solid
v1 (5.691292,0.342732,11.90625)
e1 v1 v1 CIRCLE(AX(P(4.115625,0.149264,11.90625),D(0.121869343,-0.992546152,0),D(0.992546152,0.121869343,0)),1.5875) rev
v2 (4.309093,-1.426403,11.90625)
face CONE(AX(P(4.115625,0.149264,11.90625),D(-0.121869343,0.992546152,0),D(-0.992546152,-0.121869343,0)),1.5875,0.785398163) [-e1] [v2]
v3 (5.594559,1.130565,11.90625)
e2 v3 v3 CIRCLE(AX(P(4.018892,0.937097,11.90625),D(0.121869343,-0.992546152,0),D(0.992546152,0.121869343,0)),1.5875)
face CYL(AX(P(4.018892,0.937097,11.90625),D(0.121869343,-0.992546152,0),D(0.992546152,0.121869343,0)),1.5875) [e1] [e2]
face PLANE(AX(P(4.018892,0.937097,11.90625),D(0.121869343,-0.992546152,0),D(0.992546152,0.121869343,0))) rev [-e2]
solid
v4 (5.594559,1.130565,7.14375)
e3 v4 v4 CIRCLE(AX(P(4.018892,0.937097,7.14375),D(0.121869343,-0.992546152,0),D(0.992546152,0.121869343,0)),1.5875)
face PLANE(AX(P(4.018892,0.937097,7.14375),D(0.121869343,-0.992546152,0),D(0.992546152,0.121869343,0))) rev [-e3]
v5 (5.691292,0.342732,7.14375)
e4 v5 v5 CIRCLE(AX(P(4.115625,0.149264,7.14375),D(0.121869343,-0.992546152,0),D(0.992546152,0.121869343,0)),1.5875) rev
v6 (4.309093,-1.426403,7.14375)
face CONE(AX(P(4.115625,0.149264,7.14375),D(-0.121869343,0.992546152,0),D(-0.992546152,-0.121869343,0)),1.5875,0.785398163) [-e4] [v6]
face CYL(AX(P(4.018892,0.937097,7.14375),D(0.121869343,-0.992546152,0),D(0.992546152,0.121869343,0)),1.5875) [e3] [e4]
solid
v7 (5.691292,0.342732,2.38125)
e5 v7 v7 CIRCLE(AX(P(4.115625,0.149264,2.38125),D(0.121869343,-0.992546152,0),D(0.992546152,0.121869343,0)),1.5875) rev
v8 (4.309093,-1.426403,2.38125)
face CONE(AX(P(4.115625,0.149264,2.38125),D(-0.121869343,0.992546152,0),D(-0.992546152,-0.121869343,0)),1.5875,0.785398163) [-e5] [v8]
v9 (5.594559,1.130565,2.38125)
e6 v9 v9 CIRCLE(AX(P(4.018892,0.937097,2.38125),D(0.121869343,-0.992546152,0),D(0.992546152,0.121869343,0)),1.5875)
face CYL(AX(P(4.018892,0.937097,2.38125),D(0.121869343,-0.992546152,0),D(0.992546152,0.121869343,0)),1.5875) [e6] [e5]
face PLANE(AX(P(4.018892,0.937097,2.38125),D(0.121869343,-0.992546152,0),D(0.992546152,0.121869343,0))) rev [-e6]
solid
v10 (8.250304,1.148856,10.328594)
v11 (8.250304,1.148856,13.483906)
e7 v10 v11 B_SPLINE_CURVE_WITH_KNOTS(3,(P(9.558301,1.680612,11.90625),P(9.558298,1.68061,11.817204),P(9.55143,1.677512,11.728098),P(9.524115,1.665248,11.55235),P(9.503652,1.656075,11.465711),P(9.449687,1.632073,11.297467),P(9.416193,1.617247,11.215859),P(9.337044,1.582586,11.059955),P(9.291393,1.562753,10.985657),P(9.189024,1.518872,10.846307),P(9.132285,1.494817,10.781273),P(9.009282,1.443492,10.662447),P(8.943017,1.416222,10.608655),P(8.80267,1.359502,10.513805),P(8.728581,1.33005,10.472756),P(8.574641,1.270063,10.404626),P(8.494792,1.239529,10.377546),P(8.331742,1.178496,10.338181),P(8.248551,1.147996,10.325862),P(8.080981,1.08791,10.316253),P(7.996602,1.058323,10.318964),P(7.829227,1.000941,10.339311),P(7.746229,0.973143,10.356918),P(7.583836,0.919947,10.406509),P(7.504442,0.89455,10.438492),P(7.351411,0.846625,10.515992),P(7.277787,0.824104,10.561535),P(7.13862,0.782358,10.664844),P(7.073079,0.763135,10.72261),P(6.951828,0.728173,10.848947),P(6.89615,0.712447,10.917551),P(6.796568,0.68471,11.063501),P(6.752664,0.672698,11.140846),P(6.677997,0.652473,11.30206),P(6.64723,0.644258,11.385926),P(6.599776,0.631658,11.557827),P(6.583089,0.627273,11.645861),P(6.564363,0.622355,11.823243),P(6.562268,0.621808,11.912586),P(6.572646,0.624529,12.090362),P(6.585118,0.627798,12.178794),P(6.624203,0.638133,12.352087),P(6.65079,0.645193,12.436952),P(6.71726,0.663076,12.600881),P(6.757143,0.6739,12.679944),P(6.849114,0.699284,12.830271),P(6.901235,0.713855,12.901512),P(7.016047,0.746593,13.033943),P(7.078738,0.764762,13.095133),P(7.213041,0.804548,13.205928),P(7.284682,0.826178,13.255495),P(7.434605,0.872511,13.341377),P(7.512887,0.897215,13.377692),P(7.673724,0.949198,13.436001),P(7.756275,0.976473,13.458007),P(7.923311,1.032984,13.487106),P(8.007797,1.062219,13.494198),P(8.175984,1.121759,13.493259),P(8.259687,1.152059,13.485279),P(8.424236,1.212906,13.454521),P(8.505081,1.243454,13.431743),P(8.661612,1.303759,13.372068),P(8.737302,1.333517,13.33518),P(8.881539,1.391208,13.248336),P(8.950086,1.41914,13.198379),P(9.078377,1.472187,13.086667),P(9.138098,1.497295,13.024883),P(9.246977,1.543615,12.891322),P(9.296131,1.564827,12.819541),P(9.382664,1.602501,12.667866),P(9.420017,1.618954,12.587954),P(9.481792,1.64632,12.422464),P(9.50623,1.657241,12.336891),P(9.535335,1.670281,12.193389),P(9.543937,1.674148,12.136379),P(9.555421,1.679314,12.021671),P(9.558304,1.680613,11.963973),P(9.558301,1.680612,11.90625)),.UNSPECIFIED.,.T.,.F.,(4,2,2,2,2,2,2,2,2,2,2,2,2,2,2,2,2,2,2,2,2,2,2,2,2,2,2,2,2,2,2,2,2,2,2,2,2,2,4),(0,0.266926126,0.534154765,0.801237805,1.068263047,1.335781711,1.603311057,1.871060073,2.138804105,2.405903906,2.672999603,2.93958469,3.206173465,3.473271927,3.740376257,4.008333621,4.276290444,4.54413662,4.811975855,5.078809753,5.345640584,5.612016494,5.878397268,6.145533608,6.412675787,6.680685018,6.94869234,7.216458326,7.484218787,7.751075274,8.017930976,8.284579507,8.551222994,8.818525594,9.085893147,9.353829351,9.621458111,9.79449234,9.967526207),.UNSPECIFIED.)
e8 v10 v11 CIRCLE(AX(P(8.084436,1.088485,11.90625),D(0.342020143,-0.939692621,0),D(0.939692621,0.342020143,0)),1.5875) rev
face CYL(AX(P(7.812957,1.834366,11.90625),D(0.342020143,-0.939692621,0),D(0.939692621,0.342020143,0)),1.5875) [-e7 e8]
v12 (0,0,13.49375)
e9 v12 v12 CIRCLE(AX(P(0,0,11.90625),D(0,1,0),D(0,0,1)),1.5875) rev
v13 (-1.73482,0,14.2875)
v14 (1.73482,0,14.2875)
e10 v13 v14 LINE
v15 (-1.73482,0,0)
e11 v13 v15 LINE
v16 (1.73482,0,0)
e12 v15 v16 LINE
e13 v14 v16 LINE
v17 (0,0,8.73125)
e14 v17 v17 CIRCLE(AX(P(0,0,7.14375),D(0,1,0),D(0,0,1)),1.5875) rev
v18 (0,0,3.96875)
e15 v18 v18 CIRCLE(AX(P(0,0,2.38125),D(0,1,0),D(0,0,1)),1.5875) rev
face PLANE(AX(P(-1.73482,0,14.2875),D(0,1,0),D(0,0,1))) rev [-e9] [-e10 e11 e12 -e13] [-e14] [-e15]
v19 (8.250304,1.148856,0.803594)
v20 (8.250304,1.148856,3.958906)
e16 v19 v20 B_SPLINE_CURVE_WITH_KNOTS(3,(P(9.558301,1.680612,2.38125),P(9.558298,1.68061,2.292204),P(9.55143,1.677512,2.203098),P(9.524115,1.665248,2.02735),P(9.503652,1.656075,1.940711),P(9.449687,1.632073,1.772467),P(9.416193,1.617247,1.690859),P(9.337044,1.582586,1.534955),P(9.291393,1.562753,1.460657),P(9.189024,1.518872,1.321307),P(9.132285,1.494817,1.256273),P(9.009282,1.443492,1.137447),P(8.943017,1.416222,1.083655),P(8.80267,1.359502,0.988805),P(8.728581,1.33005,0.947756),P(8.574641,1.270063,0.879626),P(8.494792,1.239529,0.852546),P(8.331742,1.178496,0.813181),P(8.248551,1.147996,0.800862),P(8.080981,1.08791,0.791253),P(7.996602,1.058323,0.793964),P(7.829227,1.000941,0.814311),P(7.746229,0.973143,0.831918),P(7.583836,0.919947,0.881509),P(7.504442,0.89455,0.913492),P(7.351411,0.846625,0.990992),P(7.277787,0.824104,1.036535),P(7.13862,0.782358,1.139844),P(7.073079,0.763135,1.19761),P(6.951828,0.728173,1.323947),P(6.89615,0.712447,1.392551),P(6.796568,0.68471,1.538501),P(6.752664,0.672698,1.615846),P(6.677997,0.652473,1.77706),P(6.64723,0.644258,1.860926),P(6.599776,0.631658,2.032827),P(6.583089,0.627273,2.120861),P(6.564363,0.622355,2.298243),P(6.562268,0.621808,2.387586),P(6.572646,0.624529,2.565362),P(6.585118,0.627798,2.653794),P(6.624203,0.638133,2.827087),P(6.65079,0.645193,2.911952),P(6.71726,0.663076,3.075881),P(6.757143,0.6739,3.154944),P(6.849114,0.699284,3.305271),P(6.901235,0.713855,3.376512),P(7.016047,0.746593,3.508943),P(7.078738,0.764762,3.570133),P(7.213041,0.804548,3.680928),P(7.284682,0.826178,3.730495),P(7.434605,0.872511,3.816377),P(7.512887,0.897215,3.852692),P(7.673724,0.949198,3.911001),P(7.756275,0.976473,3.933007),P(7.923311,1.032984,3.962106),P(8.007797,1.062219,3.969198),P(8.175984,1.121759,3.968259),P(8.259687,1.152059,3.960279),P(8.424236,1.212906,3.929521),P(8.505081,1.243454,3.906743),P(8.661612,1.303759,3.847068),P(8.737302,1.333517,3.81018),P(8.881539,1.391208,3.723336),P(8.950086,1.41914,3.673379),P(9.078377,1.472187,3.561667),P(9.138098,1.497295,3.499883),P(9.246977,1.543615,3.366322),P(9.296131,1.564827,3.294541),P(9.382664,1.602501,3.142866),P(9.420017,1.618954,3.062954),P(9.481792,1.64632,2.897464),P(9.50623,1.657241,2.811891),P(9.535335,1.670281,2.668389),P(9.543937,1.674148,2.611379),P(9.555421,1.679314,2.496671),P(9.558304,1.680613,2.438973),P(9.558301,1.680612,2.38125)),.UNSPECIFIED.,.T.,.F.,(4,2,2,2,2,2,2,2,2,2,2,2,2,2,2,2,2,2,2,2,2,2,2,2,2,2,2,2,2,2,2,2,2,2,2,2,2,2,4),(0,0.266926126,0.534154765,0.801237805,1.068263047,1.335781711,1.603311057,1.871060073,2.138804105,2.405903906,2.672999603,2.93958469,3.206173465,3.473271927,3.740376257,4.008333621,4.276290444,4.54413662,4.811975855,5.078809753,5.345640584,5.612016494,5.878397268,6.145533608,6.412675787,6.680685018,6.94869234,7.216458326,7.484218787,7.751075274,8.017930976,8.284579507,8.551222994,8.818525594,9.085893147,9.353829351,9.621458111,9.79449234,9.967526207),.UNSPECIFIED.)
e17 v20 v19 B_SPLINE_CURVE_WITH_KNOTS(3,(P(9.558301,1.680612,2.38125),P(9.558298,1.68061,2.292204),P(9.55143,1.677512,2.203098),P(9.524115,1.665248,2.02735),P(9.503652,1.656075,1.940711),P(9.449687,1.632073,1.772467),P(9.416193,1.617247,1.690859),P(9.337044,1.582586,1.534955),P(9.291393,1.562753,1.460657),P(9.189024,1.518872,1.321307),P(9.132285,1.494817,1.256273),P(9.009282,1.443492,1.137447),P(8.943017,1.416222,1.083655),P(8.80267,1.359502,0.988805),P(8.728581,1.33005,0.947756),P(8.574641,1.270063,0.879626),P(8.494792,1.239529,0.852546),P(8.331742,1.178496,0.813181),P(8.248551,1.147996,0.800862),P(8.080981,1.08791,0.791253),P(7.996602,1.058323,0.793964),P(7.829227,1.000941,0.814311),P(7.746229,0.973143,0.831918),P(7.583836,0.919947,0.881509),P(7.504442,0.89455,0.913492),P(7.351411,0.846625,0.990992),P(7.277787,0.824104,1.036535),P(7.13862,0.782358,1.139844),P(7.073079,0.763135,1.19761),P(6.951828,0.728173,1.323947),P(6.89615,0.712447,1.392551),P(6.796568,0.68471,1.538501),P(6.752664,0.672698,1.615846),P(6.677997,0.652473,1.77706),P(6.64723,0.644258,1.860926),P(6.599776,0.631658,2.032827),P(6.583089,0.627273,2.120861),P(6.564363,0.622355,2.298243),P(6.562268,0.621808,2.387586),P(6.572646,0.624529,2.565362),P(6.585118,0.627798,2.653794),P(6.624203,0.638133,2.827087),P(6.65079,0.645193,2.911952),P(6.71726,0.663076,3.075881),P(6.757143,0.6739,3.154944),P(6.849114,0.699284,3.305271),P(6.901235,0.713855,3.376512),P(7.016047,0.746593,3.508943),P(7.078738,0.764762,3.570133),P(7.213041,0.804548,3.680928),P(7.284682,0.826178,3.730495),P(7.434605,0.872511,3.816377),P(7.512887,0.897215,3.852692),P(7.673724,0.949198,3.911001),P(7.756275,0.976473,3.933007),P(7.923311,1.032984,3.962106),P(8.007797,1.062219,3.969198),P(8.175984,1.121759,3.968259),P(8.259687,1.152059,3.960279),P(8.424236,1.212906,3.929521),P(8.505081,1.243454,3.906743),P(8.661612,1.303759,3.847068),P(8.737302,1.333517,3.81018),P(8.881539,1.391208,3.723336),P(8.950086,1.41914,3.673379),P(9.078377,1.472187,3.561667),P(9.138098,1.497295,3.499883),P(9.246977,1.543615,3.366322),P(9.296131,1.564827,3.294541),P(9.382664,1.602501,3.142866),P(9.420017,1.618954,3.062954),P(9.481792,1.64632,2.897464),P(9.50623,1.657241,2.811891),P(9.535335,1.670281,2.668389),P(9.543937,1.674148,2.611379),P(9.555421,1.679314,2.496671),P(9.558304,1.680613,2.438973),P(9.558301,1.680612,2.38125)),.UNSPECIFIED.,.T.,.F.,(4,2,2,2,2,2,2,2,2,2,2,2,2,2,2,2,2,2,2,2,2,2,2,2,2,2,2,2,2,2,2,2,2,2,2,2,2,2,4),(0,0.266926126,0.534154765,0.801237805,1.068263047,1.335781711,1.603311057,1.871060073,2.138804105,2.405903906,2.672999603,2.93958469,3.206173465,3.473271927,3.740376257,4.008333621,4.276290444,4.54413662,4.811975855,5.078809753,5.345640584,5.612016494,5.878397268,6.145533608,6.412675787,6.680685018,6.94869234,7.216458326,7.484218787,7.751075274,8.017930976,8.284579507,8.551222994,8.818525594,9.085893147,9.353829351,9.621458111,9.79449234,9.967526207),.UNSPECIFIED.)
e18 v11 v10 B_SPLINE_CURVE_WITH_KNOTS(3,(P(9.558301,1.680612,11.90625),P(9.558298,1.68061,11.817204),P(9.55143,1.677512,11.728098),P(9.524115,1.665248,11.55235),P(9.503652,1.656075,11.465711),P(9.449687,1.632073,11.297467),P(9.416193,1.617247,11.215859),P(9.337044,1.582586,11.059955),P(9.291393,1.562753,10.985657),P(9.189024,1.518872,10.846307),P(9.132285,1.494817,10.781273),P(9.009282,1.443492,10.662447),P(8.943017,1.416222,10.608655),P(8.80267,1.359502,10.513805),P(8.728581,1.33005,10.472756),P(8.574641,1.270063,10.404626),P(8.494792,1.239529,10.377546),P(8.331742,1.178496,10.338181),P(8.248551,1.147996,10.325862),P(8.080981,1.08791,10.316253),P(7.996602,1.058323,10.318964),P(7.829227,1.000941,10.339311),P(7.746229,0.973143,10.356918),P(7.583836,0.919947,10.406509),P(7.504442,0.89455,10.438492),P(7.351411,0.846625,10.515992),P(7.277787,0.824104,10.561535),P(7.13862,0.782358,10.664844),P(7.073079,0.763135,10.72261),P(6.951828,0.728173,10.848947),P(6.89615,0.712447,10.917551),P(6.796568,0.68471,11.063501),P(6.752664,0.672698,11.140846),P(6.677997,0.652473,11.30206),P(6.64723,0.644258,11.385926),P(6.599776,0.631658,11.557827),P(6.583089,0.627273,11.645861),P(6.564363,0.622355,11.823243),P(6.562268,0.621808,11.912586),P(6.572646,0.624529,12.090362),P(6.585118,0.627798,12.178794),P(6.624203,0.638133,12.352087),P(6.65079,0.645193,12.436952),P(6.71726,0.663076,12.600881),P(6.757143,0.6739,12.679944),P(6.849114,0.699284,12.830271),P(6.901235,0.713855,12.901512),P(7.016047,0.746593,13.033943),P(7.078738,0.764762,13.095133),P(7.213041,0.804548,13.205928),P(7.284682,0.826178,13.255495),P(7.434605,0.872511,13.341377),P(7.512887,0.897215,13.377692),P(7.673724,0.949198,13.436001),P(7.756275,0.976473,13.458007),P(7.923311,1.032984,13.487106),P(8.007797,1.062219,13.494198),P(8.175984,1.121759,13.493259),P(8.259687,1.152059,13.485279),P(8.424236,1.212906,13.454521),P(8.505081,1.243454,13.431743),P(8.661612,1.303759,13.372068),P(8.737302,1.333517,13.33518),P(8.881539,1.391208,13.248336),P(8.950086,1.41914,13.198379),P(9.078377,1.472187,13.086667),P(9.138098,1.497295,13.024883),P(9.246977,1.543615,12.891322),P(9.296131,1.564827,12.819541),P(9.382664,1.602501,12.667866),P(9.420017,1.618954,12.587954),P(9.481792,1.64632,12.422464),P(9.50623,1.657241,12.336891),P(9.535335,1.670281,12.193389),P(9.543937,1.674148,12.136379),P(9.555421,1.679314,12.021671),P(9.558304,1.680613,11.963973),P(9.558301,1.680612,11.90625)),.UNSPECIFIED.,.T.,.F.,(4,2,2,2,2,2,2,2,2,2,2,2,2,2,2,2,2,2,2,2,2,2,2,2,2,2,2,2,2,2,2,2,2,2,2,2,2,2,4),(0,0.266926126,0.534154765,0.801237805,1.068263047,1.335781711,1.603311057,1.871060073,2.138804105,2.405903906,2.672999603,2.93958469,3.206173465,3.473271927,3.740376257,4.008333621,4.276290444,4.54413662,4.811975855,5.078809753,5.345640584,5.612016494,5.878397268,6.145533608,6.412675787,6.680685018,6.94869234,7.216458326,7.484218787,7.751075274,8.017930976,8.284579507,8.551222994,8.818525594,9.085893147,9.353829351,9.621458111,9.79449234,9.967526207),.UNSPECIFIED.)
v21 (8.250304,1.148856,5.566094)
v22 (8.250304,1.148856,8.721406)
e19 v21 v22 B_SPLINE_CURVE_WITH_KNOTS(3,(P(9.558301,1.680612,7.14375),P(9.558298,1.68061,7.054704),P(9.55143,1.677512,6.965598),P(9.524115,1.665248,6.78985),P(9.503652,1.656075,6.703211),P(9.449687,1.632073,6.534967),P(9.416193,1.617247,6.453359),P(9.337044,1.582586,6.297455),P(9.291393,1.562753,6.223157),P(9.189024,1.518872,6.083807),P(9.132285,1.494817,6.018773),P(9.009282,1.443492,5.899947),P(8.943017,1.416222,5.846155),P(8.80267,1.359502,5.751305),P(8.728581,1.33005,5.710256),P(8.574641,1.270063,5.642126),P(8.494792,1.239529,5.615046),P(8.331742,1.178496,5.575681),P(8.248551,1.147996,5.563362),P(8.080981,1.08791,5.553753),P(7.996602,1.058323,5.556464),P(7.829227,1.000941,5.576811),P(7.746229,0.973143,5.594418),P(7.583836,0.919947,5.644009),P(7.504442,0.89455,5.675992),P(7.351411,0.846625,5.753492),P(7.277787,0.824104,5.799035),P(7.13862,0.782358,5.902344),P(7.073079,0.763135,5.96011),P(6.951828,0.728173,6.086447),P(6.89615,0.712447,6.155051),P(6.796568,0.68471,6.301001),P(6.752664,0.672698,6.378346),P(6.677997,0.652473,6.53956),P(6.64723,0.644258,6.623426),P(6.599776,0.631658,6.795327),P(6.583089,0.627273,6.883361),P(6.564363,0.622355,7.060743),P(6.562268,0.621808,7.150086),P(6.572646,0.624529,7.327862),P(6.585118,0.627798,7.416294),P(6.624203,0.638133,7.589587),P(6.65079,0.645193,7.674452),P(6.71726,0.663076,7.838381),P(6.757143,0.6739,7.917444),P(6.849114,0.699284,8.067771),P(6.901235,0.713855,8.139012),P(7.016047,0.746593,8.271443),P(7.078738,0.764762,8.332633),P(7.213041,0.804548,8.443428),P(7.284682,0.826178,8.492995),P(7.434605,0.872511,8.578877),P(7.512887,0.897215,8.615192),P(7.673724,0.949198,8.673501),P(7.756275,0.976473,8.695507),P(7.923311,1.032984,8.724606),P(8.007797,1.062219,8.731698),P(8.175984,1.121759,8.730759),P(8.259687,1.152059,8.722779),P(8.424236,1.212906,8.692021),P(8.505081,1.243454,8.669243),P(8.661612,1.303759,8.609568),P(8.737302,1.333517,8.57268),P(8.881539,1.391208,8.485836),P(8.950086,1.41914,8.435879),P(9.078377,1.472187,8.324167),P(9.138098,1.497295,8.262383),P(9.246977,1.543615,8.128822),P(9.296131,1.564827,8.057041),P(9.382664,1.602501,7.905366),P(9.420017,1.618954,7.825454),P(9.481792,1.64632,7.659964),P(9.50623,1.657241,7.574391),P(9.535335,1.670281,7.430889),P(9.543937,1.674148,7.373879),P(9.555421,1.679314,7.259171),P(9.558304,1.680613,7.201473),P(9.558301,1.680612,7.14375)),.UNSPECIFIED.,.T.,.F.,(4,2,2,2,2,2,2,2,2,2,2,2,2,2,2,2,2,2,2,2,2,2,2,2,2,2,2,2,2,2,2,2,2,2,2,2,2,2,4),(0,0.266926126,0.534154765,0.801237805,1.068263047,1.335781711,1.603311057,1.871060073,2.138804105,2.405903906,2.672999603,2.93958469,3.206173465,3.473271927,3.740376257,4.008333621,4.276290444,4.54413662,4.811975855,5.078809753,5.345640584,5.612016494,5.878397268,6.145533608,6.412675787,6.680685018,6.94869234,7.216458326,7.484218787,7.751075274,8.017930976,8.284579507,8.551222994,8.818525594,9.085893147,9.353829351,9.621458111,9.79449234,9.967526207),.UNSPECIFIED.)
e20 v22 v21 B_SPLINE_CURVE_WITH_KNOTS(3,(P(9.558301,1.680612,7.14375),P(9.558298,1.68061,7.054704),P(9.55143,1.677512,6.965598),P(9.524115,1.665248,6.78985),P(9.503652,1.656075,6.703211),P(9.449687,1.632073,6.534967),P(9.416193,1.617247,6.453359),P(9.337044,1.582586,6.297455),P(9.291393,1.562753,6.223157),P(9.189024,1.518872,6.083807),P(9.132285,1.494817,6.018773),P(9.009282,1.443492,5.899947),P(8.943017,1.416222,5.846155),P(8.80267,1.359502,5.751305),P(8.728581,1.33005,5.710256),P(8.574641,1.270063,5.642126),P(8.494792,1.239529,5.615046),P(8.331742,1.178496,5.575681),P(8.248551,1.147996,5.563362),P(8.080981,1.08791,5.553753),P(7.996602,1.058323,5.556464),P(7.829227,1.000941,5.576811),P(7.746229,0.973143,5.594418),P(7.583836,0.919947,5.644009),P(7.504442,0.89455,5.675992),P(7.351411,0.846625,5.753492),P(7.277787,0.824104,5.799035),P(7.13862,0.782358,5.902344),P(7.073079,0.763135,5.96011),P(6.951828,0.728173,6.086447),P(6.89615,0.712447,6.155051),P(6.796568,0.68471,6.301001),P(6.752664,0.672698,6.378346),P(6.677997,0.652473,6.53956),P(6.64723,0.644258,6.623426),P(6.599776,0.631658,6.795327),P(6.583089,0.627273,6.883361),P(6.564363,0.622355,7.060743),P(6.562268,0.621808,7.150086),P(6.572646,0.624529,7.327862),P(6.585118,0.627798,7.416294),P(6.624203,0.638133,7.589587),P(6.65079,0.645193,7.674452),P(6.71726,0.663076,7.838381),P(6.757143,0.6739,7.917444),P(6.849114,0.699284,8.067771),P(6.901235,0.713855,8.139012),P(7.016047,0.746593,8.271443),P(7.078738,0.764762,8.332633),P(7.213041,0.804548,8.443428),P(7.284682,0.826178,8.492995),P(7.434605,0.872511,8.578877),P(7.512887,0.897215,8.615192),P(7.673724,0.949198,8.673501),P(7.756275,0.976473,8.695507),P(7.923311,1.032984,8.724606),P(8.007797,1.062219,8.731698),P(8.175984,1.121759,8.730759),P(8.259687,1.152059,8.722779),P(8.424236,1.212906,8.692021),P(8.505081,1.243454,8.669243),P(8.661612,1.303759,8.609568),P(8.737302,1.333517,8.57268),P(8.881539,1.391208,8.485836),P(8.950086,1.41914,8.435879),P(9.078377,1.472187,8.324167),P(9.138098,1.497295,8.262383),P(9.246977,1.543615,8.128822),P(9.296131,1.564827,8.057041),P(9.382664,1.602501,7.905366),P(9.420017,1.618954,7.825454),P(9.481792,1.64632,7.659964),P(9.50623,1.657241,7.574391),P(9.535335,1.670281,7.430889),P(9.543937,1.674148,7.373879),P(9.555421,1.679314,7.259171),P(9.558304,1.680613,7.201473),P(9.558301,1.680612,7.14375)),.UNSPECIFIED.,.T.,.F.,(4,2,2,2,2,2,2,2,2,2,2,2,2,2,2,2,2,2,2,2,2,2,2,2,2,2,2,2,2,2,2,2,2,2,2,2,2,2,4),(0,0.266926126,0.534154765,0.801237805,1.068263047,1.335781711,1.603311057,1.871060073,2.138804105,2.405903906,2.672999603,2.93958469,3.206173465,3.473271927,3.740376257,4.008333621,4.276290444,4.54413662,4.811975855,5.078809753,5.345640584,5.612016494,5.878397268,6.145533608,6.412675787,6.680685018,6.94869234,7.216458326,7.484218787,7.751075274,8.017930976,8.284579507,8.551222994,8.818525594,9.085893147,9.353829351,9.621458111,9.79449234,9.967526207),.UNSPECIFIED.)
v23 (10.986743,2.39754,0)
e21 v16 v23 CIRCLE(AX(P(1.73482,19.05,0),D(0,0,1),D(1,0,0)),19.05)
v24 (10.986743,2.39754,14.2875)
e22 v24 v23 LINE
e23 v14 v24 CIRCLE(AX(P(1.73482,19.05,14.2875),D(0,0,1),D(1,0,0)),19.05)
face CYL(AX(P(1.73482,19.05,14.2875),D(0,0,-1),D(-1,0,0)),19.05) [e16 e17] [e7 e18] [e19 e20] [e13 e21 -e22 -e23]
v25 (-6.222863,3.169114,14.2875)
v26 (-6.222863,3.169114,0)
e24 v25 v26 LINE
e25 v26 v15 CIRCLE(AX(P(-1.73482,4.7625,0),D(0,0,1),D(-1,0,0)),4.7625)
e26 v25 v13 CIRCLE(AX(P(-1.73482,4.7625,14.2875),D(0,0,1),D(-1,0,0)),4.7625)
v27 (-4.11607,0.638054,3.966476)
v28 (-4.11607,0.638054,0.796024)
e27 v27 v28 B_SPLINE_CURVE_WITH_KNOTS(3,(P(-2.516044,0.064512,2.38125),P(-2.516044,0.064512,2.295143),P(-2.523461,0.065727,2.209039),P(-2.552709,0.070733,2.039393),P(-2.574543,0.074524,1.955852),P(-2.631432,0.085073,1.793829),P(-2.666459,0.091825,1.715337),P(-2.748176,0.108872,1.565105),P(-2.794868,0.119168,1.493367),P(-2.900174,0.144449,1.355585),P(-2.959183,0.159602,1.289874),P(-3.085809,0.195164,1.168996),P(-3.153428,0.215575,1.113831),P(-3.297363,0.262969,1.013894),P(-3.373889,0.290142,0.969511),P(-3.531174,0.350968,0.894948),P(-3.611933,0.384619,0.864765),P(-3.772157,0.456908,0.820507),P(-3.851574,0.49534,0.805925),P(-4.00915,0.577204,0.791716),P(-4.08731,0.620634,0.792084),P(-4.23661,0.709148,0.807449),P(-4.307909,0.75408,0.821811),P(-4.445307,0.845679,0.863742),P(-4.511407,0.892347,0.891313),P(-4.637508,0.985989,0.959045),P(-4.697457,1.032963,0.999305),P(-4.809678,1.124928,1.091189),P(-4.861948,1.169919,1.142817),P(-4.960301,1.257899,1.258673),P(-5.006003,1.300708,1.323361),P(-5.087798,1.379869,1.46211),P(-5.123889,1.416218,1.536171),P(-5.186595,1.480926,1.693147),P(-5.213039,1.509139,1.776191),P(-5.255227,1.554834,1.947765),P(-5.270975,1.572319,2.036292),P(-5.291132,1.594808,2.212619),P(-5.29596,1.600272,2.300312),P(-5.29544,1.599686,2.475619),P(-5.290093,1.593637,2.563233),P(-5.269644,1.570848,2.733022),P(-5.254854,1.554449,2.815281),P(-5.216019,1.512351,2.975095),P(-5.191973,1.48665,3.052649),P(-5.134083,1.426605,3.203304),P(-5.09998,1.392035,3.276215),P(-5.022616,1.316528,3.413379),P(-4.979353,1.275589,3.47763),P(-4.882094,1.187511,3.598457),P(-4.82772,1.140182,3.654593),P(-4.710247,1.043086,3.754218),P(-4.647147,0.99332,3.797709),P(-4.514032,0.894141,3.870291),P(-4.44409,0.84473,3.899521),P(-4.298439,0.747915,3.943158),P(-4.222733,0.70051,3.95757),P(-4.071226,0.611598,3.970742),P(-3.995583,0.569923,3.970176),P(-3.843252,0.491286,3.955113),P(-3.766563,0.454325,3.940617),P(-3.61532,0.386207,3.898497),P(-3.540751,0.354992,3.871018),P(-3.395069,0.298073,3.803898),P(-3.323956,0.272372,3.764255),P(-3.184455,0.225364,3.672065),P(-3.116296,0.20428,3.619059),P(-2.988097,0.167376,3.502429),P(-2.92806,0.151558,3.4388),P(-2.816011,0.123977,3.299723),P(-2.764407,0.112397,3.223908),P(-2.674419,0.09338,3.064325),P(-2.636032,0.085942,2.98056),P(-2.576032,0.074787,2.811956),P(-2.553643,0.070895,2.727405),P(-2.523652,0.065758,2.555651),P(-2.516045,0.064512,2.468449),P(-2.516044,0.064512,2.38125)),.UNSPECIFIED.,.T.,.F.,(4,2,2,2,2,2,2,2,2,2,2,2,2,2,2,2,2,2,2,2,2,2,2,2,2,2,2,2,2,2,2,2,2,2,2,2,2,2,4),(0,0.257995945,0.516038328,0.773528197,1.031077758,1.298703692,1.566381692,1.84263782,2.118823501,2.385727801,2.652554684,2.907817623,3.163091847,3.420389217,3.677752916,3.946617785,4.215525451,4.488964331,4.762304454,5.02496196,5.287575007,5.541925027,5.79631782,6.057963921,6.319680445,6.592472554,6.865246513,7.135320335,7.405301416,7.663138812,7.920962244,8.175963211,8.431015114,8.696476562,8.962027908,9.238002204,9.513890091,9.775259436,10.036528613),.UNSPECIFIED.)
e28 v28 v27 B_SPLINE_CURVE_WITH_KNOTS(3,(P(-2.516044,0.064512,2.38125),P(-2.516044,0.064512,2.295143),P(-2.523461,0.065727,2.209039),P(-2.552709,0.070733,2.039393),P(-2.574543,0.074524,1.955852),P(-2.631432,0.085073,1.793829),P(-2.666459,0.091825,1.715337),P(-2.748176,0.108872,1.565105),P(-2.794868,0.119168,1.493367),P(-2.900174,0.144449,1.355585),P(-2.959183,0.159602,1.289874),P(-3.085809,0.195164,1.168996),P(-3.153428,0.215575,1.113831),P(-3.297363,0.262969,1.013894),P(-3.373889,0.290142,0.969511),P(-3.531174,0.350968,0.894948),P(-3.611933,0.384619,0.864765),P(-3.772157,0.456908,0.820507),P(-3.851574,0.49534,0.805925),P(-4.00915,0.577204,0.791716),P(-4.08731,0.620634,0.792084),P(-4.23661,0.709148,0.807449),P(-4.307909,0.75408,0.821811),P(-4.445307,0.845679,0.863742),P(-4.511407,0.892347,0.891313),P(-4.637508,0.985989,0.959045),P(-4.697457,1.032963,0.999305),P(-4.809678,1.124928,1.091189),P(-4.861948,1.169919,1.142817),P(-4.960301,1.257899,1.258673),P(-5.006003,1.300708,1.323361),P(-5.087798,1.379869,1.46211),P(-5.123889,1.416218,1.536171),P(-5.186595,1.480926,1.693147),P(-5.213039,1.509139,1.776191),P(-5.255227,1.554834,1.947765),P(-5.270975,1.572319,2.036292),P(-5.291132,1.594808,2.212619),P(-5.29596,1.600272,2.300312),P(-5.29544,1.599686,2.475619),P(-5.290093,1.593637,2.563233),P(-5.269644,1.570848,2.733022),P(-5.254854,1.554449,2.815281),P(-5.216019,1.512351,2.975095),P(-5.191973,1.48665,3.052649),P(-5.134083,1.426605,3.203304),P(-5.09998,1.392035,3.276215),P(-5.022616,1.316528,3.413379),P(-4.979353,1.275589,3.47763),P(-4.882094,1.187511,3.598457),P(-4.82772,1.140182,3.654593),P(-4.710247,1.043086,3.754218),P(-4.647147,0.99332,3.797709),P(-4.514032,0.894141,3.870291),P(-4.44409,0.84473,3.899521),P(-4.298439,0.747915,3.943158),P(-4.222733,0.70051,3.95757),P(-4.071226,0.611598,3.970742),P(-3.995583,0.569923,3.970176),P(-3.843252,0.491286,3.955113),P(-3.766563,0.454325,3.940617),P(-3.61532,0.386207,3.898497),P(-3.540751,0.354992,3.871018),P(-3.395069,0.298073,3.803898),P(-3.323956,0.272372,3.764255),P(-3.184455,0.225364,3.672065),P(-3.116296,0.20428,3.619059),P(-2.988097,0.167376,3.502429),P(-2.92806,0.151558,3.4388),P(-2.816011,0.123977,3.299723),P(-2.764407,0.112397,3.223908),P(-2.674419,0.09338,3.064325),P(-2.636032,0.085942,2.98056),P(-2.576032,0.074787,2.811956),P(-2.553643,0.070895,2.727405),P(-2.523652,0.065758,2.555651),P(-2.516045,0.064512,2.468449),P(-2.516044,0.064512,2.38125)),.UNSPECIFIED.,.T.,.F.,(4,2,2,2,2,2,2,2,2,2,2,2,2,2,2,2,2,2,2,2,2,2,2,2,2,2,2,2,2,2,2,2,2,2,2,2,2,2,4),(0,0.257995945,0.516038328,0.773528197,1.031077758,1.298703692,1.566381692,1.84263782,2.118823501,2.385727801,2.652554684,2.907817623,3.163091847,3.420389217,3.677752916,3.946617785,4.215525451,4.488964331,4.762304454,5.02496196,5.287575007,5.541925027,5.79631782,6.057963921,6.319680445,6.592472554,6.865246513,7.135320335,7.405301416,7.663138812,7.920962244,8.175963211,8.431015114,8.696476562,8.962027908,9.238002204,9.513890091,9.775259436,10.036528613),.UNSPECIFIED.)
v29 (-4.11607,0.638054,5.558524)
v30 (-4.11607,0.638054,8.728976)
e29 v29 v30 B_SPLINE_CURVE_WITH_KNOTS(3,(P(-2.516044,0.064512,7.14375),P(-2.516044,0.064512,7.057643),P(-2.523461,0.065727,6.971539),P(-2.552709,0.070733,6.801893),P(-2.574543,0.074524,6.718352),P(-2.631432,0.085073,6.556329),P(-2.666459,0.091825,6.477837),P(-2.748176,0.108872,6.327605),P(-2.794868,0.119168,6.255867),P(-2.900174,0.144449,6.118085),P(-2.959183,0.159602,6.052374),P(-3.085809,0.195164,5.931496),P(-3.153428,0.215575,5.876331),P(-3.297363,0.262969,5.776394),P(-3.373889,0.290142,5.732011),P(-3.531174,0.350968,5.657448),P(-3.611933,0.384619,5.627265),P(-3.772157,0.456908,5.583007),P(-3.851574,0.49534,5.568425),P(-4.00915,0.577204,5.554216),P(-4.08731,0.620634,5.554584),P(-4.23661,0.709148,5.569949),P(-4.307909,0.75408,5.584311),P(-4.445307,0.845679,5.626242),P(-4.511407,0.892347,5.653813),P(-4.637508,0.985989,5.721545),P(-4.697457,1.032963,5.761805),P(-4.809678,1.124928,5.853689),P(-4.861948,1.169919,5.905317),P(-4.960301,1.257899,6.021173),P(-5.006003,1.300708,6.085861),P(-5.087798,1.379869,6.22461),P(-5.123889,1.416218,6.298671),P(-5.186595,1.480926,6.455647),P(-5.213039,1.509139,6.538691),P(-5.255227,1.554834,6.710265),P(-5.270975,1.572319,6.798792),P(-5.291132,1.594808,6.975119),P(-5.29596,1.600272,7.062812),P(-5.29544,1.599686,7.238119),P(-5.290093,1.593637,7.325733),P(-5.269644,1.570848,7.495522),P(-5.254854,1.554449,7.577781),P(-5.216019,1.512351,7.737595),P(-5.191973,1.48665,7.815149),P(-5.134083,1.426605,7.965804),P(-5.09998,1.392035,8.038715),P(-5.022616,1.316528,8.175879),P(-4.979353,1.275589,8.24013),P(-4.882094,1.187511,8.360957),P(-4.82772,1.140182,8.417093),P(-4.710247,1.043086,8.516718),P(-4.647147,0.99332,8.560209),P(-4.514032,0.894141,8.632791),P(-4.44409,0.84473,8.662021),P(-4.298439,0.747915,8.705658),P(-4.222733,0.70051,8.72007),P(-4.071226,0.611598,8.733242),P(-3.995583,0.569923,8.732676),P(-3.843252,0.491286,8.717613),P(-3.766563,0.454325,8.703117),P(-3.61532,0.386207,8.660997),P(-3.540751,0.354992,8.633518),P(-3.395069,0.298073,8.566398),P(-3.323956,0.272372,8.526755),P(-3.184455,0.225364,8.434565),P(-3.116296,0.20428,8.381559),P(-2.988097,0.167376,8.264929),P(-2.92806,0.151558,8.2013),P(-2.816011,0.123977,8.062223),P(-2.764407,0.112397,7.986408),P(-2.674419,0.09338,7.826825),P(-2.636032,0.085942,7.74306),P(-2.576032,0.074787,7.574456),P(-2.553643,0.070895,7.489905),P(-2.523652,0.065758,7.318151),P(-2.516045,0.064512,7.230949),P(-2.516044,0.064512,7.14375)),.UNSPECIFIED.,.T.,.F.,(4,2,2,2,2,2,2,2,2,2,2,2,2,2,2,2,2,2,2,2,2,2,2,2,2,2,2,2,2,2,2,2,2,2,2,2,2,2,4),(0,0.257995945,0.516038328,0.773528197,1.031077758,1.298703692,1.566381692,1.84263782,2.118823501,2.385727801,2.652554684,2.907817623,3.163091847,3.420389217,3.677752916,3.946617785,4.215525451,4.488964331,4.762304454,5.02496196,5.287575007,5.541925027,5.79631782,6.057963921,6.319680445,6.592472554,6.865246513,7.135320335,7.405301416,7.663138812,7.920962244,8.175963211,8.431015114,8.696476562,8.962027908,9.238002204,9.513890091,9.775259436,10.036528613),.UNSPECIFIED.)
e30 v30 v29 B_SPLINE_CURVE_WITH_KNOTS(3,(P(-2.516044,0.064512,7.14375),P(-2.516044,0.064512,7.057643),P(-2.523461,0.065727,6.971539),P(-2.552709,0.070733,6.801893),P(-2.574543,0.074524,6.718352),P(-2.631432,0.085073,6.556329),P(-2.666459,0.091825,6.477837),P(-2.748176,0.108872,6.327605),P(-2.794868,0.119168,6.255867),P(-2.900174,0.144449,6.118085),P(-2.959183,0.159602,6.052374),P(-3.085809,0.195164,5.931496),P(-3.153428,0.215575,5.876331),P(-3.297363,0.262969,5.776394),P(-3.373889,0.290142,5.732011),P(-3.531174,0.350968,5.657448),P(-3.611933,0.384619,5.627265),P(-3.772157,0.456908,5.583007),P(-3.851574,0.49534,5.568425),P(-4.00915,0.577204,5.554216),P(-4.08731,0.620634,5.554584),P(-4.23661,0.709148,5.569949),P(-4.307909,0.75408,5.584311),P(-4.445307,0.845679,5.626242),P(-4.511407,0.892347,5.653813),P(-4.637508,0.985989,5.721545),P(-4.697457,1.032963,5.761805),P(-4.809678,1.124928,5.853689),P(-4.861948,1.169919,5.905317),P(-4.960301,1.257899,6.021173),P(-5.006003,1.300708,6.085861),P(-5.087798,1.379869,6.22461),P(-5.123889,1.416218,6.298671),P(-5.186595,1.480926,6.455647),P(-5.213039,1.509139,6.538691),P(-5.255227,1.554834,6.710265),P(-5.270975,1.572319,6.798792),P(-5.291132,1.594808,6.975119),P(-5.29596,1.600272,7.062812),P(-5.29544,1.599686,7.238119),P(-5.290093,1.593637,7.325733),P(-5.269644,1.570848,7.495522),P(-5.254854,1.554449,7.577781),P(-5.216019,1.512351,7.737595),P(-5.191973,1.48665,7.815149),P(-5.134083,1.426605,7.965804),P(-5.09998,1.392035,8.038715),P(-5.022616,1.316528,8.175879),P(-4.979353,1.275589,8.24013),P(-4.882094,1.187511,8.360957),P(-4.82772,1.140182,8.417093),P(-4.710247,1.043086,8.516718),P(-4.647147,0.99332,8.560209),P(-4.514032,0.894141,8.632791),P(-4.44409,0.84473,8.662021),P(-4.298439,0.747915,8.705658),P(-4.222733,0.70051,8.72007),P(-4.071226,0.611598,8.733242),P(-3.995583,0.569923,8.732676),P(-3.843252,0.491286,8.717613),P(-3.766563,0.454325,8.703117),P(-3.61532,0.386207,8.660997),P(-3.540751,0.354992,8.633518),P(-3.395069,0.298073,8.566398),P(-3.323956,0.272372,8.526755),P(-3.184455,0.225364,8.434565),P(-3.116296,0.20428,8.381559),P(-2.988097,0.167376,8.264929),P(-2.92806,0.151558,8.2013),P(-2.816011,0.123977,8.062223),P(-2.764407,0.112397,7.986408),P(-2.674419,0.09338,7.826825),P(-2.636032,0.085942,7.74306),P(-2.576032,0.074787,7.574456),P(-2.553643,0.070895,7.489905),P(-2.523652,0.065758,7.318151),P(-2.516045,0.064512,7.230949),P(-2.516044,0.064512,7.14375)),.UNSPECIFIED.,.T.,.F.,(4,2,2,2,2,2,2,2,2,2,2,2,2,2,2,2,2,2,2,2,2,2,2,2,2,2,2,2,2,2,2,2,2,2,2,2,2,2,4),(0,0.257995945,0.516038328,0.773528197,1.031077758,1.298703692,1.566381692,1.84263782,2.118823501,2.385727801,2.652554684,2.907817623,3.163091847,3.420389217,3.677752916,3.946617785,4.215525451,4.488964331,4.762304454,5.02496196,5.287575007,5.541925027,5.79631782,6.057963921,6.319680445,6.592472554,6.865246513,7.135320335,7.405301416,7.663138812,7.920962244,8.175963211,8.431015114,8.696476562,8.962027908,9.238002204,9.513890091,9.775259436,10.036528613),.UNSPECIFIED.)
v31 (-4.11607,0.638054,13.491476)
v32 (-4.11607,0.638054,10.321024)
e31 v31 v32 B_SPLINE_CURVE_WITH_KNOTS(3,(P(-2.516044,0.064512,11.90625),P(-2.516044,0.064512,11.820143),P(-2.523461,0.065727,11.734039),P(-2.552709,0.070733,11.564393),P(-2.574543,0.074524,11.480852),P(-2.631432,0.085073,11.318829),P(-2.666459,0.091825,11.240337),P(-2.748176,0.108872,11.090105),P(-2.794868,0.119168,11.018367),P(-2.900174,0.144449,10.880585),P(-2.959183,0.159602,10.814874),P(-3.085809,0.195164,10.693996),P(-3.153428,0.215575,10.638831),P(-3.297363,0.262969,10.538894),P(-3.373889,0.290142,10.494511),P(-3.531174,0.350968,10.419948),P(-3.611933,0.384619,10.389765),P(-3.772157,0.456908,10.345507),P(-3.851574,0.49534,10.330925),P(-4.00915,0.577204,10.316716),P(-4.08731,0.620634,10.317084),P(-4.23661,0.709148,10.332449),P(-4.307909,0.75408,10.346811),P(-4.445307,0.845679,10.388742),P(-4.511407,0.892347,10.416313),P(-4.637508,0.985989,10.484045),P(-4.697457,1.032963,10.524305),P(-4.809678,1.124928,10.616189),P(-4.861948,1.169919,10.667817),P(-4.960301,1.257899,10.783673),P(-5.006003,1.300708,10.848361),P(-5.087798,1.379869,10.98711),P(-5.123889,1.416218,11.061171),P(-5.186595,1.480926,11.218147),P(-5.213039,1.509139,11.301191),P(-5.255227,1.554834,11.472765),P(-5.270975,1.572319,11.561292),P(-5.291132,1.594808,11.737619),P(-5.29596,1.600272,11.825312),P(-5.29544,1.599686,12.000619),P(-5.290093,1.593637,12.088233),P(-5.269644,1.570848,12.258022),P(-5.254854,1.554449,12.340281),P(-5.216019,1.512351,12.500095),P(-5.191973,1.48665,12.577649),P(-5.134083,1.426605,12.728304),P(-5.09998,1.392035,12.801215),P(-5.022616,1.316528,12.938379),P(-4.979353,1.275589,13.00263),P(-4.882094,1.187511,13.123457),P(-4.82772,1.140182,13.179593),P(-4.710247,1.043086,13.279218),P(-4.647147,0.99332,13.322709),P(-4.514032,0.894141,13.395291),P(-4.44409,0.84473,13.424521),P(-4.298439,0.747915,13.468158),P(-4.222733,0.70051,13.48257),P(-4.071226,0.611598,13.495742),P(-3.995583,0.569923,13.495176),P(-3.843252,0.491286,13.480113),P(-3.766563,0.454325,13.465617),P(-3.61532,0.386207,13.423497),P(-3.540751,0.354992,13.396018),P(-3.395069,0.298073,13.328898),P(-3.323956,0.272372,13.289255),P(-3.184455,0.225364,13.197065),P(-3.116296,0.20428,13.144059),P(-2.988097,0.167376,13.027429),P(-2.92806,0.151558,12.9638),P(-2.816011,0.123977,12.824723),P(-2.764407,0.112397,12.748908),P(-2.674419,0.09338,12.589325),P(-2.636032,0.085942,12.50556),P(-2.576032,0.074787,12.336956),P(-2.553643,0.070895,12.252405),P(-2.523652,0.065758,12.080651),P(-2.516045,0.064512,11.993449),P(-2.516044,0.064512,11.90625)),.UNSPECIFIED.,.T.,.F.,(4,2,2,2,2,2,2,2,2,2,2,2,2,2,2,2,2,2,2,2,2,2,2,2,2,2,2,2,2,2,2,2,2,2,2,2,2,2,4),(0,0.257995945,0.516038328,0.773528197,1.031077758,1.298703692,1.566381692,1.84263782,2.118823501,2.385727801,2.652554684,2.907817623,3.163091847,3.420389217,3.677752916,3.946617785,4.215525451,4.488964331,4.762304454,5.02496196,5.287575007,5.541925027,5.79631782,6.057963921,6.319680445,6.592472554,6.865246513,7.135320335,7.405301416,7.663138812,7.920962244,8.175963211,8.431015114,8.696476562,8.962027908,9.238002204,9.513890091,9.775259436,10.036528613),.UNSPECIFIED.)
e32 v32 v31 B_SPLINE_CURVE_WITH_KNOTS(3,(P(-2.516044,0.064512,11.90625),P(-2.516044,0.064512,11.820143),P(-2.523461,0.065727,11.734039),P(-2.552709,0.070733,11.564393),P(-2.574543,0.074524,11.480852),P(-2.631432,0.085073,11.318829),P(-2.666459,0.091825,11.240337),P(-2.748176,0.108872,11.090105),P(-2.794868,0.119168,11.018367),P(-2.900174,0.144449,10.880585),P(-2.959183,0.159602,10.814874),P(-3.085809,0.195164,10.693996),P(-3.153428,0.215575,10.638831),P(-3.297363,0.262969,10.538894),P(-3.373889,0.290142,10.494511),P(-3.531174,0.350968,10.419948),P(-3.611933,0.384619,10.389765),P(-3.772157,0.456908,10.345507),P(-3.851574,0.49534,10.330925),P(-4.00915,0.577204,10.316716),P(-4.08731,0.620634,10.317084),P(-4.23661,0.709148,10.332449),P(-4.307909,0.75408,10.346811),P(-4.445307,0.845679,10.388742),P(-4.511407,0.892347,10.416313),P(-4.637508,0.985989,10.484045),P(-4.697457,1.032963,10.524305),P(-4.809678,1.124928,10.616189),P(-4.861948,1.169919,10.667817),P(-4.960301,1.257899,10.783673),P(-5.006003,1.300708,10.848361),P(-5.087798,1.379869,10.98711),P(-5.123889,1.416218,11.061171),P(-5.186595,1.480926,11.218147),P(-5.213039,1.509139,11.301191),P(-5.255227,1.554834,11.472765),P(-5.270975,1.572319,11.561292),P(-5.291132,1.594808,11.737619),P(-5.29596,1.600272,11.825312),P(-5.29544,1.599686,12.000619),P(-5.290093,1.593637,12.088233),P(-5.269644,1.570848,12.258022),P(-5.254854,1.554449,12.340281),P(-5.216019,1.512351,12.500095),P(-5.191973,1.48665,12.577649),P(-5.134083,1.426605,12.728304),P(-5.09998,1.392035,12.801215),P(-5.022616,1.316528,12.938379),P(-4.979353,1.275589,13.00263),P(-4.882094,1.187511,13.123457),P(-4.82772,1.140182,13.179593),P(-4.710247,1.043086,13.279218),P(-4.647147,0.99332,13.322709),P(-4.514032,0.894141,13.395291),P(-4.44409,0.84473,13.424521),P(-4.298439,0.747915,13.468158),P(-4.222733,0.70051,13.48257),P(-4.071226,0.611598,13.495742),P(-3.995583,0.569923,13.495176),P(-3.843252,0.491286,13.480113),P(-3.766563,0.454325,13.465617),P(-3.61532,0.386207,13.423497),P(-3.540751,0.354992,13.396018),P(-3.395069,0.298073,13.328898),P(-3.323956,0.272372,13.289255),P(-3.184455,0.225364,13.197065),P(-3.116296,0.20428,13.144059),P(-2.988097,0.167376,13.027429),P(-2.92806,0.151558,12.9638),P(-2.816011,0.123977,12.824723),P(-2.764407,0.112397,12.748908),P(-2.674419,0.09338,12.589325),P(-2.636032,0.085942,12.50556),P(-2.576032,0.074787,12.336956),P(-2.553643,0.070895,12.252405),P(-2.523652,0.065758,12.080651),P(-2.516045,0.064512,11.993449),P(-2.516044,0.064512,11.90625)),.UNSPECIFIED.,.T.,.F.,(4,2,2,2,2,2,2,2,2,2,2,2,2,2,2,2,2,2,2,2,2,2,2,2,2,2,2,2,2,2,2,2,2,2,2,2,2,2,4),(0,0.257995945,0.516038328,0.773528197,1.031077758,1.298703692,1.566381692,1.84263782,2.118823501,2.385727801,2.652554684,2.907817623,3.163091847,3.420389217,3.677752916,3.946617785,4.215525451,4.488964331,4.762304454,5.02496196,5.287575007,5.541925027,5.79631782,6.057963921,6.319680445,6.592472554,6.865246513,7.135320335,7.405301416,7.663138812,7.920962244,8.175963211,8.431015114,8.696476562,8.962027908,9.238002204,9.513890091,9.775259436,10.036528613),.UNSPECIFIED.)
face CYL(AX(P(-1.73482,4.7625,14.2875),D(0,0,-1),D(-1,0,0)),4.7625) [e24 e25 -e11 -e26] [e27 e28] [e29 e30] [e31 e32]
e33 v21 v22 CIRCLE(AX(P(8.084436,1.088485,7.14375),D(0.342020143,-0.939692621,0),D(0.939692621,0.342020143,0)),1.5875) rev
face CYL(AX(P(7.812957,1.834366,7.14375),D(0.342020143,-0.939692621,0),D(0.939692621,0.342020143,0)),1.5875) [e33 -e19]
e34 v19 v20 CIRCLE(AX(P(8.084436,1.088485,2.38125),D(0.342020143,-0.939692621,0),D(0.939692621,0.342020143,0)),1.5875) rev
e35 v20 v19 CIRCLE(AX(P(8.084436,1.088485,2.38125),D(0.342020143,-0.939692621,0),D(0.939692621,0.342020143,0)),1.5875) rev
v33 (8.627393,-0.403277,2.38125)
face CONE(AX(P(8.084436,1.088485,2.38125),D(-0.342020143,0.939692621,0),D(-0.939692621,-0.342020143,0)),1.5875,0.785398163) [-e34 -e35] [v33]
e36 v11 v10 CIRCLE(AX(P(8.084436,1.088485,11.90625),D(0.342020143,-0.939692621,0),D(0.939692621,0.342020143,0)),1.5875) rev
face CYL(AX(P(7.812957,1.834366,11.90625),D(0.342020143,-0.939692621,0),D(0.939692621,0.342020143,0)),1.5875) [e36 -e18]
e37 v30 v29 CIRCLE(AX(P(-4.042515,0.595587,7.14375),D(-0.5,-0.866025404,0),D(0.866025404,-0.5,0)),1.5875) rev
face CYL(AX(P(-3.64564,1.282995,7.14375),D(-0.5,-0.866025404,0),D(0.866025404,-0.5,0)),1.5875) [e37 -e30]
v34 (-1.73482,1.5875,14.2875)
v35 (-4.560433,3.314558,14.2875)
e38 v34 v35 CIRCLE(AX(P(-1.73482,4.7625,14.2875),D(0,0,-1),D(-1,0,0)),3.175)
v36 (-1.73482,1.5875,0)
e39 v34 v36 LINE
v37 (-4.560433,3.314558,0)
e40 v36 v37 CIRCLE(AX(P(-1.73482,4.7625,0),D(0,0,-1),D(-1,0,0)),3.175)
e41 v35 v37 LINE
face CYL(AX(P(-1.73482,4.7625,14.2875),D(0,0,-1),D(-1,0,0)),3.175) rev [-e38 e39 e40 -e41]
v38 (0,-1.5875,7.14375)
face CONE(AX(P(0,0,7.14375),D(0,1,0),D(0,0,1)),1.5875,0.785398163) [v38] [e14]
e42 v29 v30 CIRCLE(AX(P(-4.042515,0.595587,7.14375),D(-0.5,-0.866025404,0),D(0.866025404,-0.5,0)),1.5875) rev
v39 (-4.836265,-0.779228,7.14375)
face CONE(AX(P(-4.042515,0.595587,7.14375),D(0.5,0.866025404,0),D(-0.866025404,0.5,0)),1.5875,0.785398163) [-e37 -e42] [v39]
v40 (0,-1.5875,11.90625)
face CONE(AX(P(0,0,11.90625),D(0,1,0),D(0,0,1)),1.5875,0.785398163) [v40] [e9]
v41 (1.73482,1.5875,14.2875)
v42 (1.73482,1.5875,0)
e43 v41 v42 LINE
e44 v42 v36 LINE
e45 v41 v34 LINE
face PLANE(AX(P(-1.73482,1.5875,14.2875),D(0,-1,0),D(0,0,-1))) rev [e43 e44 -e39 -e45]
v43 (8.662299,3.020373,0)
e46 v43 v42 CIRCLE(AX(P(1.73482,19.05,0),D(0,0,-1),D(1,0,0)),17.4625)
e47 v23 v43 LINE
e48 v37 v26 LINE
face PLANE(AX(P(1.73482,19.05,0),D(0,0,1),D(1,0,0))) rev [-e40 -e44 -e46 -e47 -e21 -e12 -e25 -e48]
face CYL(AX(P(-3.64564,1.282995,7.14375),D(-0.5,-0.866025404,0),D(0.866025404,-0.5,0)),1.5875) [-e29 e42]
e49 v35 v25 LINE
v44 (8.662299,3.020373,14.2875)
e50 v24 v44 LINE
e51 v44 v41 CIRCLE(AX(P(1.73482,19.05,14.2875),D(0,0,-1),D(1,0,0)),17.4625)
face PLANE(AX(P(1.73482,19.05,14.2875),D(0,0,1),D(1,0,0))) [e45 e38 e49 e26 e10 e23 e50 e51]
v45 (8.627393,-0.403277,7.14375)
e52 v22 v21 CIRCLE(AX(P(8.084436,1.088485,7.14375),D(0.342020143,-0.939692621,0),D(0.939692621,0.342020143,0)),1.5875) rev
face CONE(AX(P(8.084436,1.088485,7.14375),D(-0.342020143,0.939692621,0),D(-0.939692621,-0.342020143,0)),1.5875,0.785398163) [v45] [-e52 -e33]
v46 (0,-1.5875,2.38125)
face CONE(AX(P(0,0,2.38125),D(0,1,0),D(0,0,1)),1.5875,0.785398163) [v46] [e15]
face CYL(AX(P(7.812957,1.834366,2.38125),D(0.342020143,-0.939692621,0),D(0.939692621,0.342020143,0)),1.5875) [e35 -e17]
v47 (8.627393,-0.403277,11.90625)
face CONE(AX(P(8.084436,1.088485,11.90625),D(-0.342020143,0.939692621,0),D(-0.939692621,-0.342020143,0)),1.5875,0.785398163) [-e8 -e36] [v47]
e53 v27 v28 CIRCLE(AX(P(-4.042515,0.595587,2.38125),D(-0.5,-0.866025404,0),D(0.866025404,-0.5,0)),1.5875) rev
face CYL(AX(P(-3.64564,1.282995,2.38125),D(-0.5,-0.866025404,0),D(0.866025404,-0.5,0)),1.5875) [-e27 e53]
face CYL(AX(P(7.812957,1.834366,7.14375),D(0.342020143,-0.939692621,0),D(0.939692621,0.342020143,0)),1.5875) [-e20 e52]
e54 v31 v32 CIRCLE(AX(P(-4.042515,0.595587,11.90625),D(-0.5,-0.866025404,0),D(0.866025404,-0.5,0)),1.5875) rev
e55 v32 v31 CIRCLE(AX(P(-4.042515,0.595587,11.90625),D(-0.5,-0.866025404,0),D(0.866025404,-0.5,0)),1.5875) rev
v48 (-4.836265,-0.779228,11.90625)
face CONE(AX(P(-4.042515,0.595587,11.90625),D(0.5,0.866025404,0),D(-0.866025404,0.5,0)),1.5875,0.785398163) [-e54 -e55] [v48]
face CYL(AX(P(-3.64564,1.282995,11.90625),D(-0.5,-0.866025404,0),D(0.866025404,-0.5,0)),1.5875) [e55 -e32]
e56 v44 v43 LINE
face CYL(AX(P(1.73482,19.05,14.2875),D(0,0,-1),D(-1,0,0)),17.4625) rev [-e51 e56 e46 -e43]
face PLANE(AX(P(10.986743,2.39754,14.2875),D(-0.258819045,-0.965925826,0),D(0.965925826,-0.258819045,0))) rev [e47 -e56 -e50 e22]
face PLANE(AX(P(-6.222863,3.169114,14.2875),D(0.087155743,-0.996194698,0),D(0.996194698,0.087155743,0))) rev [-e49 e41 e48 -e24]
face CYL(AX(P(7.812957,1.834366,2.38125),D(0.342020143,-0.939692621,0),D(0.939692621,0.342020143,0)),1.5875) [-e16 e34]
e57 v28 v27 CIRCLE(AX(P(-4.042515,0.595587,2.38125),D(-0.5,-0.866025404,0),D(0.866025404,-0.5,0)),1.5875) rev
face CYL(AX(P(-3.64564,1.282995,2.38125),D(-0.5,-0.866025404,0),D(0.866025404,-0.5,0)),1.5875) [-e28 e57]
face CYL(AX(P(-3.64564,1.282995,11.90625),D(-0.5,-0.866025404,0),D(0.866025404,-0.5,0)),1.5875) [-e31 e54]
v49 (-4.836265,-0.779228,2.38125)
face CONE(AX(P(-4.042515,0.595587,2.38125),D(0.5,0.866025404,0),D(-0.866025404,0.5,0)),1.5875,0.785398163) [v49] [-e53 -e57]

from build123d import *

# Parameters (mm, degrees)
BOSS_EXTRUDE1_DEPTH        = 14.2875
SKETCH2_R                  = 1.5875
BOSS_EXTRUDE2_DEPTH        = 1.5875
CHAMFER1_SIZE              = 1.5875
BOSS_EXTRUDE3_DEPTH        = 1.5875
BOSS_EXTRUDE3_DEPTH_BACK   = 0.79375
SKETCH3_R                  = 1.5875
CHAMFER2_SIZE              = 1.5875
BOSS_EXTRUDE4_DEPTH        = 1.5875
BOSS_EXTRUDE4_DEPTH_BACK   = 0.79375
SKETCH5_R                  = 1.5875
BOSS_EXTRUDE4_2_DEPTH      = 1.5875
BOSS_EXTRUDE4_2_DEPTH_BACK = 0.79375
BOSS_EXTRUDE4_3_DEPTH      = 1.5875
BOSS_EXTRUDE4_3_DEPTH_BACK = 0.79375
CHAMFER3_SIZE              = 1.5875
CHAMFER4_SIZE              = 1.5875
CHAMFER5_SIZE              = 1.5875
BOSS_EXTRUDE5_DEPTH        = 1.5875
BOSS_EXTRUDE5_DEPTH_BACK   = 0.79375
SKETCH6_R                  = 1.5875
CHAMFER6_SIZE              = 1.5875


with BuildPart() as part:
    # Sketch1 → Boss-Extrude1 (new body)
    with BuildSketch(Plane.XY):
        with BuildLine():
            Line((-1.73482, 0), (1.73482, 0))
            ThreePointArc((1.73482, 0), (6.513582382, 0.609123391), (10.98674309, 2.397540147))
            Line((10.98674309, 2.397540147), (8.662299056, 3.020373049))
            ThreePointArc((8.662299056, 3.020373049), (5.271877083, 1.949469791), (1.73482, 1.5875))
            Line((1.73482, 1.5875), (-1.73482, 1.5875))
            ThreePointArc((-1.73482, 1.5875), (-3.390629266, 2.053455764), (-4.560432944, 3.314557843))
            Line((-4.560432944, 3.314557843), (-6.222862733, 3.169114083))
            ThreePointArc((-6.222862733, 3.169114083), (-4.481900798, 0.872133264), (-1.73482, 0))
        make_face()
    extrude(amount=BOSS_EXTRUDE1_DEPTH)

    # Sketch2 → Boss-Extrude2 (add)
    with BuildSketch(Plane.XZ):
        with Locations(Location((0, 2.38125, 0), (0, 0, 90))):
            Circle(SKETCH2_R)
        with Locations(Location((0, 7.14375, 0), (0, 0, 90))):
            Circle(SKETCH2_R)
        with Locations(Location((0, 11.90625, 0), (0, 0, 90))):
            Circle(SKETCH2_R)
    extrude(amount=BOSS_EXTRUDE2_DEPTH)

    # Chamfer1
    chamfer1_edges = [part.edges().sort_by_distance(p)[0] for p in [
        (0, -1.5875, 0.79375),
        (0, -1.5875, 5.55625),
        (0, -1.5875, 10.31875),
    ]]
    chamfer(chamfer1_edges, length=CHAMFER1_SIZE - 0.0001)  # a hair under: the kernel refuses the full size

    # Sketch3 → Boss-Extrude3 (add, two sides: drawn at the far end of the back side and taken through both)
    with BuildSketch(Plane(origin=(-0.752732007, -1.303770081, 0), x_dir=(0, 0, -1), z_dir=(-0.500000000000001, -0.866025403784438, 0)).offset(-BOSS_EXTRUDE3_DEPTH_BACK)):
        with Locations(Location((-2.38125, -3.798714252, 0), (0, 0, 90))):
            Circle(SKETCH3_R)
        with Locations(Location((-7.14375, -3.798714252, 0), (0, 0, 90))):
            Circle(SKETCH3_R)
        with Locations(Location((-11.90625, -3.798714252, 0), (0, 0, 90))):
            Circle(SKETCH3_R)
    extrude(amount=BOSS_EXTRUDE3_DEPTH + BOSS_EXTRUDE3_DEPTH_BACK)

    # Chamfer2
    chamfer2_edges = [part.edges().sort_by_distance(p)[0] for p in [
        (-6.21108038, 0.014521717, 2.38125),
        (-6.21108038, 0.014521717, 7.14375),
        (-6.21108038, 0.014521717, 11.90625),
    ]]
    chamfer(chamfer2_edges, length=CHAMFER2_SIZE - 0.0001)  # a hair under: the kernel refuses the full size

    # Sketch6 → Boss-Extrude5 (add, two sides: drawn at the far end of the back side and taken through both)
    with BuildSketch(Plane(origin=(0.595867138, -1.637131506, 0), x_dir=(0, 0, -1), z_dir=(0.34202014332566943, -0.9396926207859081, 0)).offset(-BOSS_EXTRUDE5_DEPTH_BACK)):
        with Locations(Location((-11.90625, 7.969168433, 0), (0, 0, 90))):
            Circle(SKETCH6_R)
        with Locations(Location((-7.14375, 7.969168433, 0), (0, 0, 90))):
            Circle(SKETCH6_R)
        with Locations(Location((-2.38125, 7.969168433, 0), (0, 0, 90))):
            Circle(SKETCH6_R)
    extrude(amount=BOSS_EXTRUDE5_DEPTH + BOSS_EXTRUDE5_DEPTH_BACK)

    # Chamfer6
    chamfer6_edges = [part.edges().sort_by_distance(p)[0] for p in [
        (7.13563085, -0.946234389, 11.90625),
        (7.13563085, -0.946234389, 7.14375),
        (7.13563085, -0.946234389, 2.38125),
    ]]
    chamfer(chamfer6_edges, length=CHAMFER6_SIZE - 0.0001)  # a hair under: the kernel refuses the full size


with BuildPart() as body_2:
    # Sketch5 → Boss-Extrude4 (new, two sides: drawn at the far end of the back side and taken through both)
    with BuildSketch(Plane(origin=(0.04307072, -0.350782867, 0), x_dir=(0, 0, -1), z_dir=(0.12186934340514774, -0.992546151641322, 0)).offset(-BOSS_EXTRUDE4_DEPTH_BACK)):
        with Locations(Location((-7.14375, 4.103138915, 0), (0, 0, 90))):
            Circle(SKETCH5_R)
    extrude(amount=BOSS_EXTRUDE4_DEPTH + BOSS_EXTRUDE4_DEPTH_BACK)

    # Chamfer4
    chamfer4_edges = [body_2.edges().sort_by_distance(p)[0] for p in [
        (2.733426027, -1.61987062, 7.14375),
    ]]
    chamfer(chamfer4_edges, length=CHAMFER4_SIZE - 0.0001)  # a hair under: the kernel refuses the full size


with BuildPart() as body_3:
    # Sketch5 → Boss-Extrude4 2 (new, two sides: drawn at the far end of the back side and taken through both)
    with BuildSketch(Plane(origin=(0.04307072, -0.350782867, 0), x_dir=(0, 0, -1), z_dir=(0.12186934340514774, -0.992546151641322, 0)).offset(-BOSS_EXTRUDE4_2_DEPTH_BACK)):
        with Locations(Location((-2.38125, 4.103138915, 0), (0, 0, 90))):
            Circle(SKETCH5_R)
    extrude(amount=BOSS_EXTRUDE4_2_DEPTH + BOSS_EXTRUDE4_2_DEPTH_BACK)

    # Chamfer5
    chamfer5_edges = [body_3.edges().sort_by_distance(p)[0] for p in [
        (2.733426027, -1.61987062, 2.38125),
    ]]
    chamfer(chamfer5_edges, length=CHAMFER5_SIZE - 0.0001)  # a hair under: the kernel refuses the full size


with BuildPart() as body_4:
    # Sketch5 → Boss-Extrude4 3 (new, two sides: drawn at the far end of the back side and taken through both)
    with BuildSketch(Plane(origin=(0.04307072, -0.350782867, 0), x_dir=(0, 0, -1), z_dir=(0.12186934340514774, -0.992546151641322, 0)).offset(-BOSS_EXTRUDE4_3_DEPTH_BACK)):
        with Locations(Location((-11.90625, 4.103138915, 0), (0, 0, 90))):
            Circle(SKETCH5_R)
    extrude(amount=BOSS_EXTRUDE4_3_DEPTH + BOSS_EXTRUDE4_3_DEPTH_BACK)

    # Chamfer3
    chamfer3_edges = [body_4.edges().sort_by_distance(p)[0] for p in [
        (2.733426027, -1.61987062, 11.90625),
    ]]
    chamfer(chamfer3_edges, length=CHAMFER3_SIZE - 0.0001)  # a hair under: the kernel refuses the full size


solid = Compound([part.part, body_2.part, body_3.part, body_4.part])
